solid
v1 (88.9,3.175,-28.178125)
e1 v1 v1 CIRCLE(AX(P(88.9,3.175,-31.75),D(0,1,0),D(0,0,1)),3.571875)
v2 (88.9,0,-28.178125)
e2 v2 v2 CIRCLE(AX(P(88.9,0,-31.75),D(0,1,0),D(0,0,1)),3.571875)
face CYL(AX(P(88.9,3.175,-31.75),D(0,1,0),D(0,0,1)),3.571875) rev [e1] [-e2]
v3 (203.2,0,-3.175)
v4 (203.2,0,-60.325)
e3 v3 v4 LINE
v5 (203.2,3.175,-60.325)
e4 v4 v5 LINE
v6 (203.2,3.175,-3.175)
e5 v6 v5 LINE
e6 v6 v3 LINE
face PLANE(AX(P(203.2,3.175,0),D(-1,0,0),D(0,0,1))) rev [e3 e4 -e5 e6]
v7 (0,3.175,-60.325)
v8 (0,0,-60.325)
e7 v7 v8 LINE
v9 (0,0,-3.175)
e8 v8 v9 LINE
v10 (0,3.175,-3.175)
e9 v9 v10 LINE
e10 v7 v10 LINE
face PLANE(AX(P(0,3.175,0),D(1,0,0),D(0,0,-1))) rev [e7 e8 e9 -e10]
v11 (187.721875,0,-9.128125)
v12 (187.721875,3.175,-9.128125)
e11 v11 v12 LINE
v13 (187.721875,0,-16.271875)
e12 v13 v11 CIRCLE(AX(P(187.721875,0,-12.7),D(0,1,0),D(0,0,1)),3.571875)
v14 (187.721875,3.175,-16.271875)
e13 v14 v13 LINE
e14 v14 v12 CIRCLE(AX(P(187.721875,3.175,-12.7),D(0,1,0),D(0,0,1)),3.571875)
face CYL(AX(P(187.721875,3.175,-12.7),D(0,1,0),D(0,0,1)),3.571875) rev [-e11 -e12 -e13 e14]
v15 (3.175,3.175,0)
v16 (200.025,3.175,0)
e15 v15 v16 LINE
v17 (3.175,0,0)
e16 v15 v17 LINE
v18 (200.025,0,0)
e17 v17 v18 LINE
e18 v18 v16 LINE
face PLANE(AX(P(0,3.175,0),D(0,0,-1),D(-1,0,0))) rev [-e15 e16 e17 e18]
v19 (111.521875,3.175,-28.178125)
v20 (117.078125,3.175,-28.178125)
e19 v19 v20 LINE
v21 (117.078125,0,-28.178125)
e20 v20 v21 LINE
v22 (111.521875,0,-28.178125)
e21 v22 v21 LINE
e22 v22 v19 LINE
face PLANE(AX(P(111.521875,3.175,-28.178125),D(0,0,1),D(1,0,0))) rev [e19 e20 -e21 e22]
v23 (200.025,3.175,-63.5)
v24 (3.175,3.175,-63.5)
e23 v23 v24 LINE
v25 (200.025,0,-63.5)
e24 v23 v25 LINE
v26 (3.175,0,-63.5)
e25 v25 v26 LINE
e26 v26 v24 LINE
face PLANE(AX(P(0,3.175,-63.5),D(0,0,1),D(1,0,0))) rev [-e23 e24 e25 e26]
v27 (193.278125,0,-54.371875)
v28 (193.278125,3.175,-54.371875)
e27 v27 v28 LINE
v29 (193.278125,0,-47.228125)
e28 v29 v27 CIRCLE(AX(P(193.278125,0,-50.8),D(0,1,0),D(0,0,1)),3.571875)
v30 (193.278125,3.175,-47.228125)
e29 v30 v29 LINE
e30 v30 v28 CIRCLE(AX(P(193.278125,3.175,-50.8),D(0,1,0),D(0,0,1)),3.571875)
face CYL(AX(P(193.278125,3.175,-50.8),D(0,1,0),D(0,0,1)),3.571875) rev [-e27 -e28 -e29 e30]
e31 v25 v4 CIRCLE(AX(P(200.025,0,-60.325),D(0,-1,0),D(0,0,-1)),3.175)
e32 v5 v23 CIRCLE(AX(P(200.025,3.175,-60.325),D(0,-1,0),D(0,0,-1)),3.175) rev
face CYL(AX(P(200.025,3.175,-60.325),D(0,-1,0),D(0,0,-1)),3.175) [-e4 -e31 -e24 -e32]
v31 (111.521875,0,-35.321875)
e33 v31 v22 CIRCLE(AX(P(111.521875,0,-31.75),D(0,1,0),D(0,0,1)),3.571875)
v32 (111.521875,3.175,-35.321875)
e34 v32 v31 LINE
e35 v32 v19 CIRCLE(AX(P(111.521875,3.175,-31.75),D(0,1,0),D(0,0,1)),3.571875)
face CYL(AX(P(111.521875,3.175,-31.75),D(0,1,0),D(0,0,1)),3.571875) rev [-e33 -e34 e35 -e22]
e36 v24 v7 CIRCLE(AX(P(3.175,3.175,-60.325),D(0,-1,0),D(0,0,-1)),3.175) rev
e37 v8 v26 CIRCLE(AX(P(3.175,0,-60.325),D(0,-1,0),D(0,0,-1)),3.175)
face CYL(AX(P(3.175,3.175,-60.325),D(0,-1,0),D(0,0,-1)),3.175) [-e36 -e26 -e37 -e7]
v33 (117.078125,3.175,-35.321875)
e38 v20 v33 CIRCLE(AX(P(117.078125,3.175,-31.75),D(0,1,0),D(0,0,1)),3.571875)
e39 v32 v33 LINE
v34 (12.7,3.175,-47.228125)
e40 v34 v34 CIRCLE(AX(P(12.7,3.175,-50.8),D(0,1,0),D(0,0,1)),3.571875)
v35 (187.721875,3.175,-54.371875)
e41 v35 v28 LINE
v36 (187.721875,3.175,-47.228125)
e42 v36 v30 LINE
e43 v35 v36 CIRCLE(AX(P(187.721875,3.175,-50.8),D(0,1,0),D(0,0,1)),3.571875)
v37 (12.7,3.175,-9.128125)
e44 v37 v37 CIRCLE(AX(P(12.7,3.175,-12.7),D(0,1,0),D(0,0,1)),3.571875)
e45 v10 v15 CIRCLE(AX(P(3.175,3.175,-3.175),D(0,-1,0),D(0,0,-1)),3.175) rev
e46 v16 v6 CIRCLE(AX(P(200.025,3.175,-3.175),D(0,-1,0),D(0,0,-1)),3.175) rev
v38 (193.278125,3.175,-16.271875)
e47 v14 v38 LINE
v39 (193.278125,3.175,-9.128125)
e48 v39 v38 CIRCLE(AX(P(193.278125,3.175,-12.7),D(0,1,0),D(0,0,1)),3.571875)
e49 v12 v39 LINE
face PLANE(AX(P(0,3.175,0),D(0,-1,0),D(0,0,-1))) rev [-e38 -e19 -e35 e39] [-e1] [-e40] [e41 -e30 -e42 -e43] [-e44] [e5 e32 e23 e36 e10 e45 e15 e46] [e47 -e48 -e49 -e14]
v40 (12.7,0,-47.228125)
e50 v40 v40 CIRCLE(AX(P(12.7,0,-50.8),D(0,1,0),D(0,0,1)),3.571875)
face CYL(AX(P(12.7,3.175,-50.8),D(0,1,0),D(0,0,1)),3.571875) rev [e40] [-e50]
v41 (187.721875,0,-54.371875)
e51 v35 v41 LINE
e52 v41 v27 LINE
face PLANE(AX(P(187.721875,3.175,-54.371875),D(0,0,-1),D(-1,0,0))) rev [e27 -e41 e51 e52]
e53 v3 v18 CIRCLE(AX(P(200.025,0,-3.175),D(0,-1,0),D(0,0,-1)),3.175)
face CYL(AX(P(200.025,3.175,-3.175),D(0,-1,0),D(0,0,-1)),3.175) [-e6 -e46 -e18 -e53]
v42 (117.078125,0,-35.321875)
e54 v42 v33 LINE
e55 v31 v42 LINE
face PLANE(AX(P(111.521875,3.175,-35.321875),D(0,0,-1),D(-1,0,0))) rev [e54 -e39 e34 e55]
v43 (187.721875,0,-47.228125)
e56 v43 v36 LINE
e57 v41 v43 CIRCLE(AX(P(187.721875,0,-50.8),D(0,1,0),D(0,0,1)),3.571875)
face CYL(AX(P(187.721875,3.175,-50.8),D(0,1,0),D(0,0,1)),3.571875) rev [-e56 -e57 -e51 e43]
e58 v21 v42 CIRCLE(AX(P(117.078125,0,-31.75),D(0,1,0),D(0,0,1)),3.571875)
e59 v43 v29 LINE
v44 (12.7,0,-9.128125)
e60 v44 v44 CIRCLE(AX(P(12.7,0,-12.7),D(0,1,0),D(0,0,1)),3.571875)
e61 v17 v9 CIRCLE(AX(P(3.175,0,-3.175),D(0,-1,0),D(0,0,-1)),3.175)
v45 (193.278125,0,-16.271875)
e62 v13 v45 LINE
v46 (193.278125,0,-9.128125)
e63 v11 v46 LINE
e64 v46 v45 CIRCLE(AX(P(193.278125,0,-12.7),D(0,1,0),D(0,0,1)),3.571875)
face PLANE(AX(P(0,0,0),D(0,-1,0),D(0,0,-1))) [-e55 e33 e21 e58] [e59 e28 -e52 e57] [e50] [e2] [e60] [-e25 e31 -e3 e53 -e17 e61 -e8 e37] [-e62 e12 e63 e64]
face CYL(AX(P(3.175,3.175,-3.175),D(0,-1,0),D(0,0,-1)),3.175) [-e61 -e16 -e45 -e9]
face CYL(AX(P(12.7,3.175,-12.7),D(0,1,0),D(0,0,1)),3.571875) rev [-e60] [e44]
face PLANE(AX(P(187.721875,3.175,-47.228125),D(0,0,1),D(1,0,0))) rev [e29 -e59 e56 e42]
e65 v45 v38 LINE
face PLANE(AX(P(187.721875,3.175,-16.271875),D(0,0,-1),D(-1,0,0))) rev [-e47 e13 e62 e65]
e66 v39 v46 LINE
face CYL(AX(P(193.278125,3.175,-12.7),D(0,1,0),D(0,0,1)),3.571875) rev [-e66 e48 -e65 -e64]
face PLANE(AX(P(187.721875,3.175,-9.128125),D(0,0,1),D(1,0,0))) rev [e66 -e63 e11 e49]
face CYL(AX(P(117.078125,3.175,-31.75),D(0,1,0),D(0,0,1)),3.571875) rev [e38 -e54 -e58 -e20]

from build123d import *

# Parameters (mm, degrees)
SKETCH1_W                           = 203.2
SKETCH1_H                           = 63.5
BOSS_EXTRUDE1_DEPTH                 = 3.175
F_9_32_0_28125_DIAMETER_HOLE1_D     = 7.14375
F_9_32_0_28125_DIAMETER_SLOT1_DEPTH = 3.175
FILLET1_R                           = 3.175


# Read off the part's stored shape, not the designer's step: 9/32 (0.28125) Diameter Slot1
with BuildPart() as part:
    # Sketch1 → Boss-Extrude1 (new body)
    with BuildSketch(Plane(origin=(0, 0, 0), x_dir=(1, 0, 0), z_dir=(0, 1, 0))):
        with Locations((101.6, 31.75)):
            Rectangle(SKETCH1_W, SKETCH1_H)
    extrude(amount=BOSS_EXTRUDE1_DEPTH)

    # 9/32 (0.28125) Diameter Hole1 (through all)
    with Locations(Plane(origin=(0, 3.175, 0), x_dir=(1, 0, 0), z_dir=(0, 1, 0))):
        with Locations((12.7, 12.7), (12.7, 50.8), (88.9, 31.75)):
            Hole(F_9_32_0_28125_DIAMETER_HOLE1_D / 2)

    # 9/32 (0.28125) Diameter Slot1 outline → 9/32 (0.28125) Diameter Slot1 (cut)
    with BuildSketch(Plane(origin=(0, 0, 0), x_dir=(1, 0, 0), z_dir=(0, 1, 0))):
        with BuildLine():
            Line((187.721875, 9.128125), (193.278125, 9.128125))
            ThreePointArc((193.278125, 9.128125), (196.85, 12.7), (193.278125, 16.271875))
            Line((193.278125, 16.271875), (187.721875, 16.271875))
            ThreePointArc((187.721875, 16.271875), (184.15, 12.7), (187.721875, 9.128125))
        make_face()
        with BuildLine():
            Line((187.721875, 47.228125), (193.278125, 47.228125))
            ThreePointArc((193.278125, 47.228125), (196.85, 50.8), (193.278125, 54.371875))
            Line((193.278125, 54.371875), (187.721875, 54.371875))
            ThreePointArc((187.721875, 54.371875), (184.15, 50.8), (187.721875, 47.228125))
        make_face()
        with BuildLine():
            Line((111.521875, 28.178125), (117.078125, 28.178125))
            ThreePointArc((117.078125, 28.178125), (120.65, 31.75), (117.078125, 35.321875))
            Line((117.078125, 35.321875), (111.521875, 35.321875))
            ThreePointArc((111.521875, 35.321875), (107.95, 31.75), (111.521875, 28.178125))
        make_face()
    extrude(amount=F_9_32_0_28125_DIAMETER_SLOT1_DEPTH, mode=Mode.SUBTRACT)

    # Fillet1
    fillet1_edges = [part.edges().sort_by_distance(p)[0] for p in [
        (0, 1.5875, -63.5),
        (203.2, 1.5875, -63.5),
        (203.2, 1.5875, 0),
        (0, 1.5875, 0),
    ]]
    fillet(fillet1_edges, radius=FILLET1_R)


solid = part.part
